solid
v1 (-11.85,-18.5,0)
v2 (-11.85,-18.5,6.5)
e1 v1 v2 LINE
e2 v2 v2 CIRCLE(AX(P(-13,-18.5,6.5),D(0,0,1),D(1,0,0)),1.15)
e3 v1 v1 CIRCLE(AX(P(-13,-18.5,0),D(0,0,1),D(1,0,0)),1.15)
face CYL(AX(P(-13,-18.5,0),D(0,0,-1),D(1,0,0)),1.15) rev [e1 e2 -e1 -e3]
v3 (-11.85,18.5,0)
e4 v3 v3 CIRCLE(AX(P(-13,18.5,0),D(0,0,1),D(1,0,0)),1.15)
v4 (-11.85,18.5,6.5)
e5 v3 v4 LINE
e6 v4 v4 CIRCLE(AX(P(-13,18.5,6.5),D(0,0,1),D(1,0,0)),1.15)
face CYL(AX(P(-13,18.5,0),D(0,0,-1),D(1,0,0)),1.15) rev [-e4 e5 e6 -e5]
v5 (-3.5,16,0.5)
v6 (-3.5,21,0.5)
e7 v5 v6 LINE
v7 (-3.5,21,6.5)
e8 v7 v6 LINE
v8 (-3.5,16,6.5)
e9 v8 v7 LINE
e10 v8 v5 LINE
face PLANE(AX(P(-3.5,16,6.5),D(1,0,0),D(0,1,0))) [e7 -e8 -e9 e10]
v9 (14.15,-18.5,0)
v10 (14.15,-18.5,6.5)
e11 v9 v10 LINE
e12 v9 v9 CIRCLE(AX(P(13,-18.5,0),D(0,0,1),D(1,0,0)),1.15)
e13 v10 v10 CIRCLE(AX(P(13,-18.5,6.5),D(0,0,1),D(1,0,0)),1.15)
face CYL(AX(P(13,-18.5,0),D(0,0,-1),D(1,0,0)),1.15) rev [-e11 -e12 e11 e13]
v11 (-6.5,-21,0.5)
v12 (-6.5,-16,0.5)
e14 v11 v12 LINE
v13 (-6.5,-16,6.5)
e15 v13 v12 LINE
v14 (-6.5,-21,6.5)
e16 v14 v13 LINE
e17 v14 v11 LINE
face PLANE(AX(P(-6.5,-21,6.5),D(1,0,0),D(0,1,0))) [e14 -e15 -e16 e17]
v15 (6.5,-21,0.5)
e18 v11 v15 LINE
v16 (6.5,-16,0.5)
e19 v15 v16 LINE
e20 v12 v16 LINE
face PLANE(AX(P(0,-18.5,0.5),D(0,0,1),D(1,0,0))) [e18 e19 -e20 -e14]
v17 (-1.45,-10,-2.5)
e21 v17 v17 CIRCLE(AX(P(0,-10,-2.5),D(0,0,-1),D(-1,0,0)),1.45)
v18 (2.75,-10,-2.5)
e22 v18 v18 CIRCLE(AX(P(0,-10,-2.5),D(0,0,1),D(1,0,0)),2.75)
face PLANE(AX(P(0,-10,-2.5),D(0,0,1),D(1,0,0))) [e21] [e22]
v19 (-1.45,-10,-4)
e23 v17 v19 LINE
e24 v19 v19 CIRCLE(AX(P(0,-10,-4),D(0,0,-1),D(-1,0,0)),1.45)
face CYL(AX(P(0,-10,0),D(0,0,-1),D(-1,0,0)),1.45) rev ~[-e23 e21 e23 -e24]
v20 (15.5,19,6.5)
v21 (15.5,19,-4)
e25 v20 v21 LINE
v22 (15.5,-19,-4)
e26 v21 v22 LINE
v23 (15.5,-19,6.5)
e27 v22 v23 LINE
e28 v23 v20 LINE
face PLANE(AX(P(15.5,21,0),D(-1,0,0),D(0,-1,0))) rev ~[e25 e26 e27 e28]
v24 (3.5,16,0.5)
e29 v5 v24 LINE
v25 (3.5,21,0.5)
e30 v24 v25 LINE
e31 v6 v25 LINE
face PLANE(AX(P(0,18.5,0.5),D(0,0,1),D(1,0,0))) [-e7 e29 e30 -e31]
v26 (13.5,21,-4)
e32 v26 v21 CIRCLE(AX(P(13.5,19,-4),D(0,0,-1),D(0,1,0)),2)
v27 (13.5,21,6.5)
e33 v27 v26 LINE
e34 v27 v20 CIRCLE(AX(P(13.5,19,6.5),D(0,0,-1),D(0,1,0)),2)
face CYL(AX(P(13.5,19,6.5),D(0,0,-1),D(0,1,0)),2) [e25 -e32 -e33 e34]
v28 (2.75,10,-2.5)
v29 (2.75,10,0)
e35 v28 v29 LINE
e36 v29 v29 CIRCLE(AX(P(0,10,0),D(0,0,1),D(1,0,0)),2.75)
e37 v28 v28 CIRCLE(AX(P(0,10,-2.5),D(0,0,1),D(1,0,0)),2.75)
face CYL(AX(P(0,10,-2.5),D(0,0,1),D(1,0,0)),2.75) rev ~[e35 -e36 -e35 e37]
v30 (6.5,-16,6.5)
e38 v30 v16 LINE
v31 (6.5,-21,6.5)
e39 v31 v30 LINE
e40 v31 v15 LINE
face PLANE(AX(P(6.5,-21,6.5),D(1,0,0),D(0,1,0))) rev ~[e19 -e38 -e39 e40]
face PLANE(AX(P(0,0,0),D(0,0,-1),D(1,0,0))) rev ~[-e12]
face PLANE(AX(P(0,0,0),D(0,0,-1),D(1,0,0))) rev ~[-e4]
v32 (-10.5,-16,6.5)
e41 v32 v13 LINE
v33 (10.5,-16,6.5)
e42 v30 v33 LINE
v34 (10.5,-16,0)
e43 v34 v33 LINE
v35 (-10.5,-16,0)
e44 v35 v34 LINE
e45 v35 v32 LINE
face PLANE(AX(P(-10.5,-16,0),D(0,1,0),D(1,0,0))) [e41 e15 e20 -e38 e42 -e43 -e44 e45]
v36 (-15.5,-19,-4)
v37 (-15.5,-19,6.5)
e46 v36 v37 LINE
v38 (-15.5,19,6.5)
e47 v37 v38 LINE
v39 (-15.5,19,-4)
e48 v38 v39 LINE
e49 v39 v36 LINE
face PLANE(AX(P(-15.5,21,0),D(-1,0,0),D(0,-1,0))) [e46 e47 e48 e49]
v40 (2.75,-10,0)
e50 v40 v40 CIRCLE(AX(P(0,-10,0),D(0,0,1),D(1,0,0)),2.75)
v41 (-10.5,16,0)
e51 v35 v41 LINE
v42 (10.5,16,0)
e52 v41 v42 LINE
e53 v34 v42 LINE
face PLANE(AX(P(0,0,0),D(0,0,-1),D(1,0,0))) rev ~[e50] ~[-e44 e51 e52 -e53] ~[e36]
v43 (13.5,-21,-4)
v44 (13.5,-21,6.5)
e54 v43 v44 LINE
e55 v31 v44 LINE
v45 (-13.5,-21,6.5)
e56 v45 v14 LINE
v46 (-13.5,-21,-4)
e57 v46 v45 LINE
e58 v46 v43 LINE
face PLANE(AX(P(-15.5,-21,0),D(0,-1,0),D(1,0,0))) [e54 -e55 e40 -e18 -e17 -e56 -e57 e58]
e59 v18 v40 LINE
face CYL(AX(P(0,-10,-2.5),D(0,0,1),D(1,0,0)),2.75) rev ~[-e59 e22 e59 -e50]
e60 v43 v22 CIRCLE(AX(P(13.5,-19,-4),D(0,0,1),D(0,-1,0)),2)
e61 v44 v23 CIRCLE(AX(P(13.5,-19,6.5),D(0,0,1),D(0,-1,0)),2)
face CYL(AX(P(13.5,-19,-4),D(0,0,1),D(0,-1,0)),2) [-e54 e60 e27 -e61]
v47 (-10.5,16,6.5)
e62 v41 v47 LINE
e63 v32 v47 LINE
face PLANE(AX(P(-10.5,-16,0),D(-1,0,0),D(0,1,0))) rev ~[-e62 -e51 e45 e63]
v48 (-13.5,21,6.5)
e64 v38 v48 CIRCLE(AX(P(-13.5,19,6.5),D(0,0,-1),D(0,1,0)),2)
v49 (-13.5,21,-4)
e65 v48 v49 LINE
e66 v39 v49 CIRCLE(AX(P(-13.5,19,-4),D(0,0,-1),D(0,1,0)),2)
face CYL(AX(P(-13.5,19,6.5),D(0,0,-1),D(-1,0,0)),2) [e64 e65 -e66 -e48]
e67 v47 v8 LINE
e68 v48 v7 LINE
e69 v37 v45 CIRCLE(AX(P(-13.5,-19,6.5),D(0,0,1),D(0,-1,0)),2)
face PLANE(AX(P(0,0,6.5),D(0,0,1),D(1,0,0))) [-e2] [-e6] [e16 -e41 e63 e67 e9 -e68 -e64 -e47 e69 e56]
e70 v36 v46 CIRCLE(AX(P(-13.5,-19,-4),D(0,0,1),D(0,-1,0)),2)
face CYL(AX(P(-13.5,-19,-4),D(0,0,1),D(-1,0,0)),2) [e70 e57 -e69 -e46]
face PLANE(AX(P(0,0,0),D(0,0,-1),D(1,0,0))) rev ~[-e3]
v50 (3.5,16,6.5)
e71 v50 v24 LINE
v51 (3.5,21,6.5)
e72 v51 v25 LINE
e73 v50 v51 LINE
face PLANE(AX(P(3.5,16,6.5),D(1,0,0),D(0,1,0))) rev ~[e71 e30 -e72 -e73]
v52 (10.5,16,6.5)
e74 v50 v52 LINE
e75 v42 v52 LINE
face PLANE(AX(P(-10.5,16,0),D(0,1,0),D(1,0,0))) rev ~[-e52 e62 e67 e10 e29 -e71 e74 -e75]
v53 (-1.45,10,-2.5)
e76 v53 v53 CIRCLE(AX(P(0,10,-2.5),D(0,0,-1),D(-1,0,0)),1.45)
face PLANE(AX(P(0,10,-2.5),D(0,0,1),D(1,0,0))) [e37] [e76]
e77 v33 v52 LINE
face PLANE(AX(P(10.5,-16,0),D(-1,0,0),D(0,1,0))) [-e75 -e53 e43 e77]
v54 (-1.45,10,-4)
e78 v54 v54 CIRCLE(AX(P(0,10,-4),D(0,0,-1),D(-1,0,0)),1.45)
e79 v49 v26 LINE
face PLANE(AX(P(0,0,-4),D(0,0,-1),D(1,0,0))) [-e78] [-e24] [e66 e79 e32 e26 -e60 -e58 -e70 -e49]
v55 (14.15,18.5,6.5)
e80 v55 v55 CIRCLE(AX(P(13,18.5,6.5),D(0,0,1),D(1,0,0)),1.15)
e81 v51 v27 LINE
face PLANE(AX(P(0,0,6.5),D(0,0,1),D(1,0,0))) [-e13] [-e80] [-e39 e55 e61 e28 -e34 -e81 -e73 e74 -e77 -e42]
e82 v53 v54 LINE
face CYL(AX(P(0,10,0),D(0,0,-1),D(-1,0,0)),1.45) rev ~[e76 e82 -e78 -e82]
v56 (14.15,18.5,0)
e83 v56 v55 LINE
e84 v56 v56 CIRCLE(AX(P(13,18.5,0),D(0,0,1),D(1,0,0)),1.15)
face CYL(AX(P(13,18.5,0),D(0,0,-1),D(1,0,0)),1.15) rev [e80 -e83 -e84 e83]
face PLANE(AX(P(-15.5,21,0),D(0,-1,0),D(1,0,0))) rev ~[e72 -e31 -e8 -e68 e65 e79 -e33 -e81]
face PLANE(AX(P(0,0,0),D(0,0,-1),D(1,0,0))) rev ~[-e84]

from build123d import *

# Parameters (mm, degrees)
F0_W           = 31
F0_H           = 42
F0_R           = 1.15
F0_W_2         = 21
F0_H_2         = 32
F1_DEPTH       = 6.5
F2_W           = 31
F2_H           = 42
F2_R           = 1.15
F2_W_2         = 21
F2_H_2         = 32
F3_DEPTH       = 4
F4_W           = 13
F4_H           = 5
F4_W_2         = 7
F5_DEPTH       = 6
F6_R           = 2
F8_D           = 2.9
F8_CBORE_D     = 5.5
F8_CBORE_DEPTH = 2.5


with BuildPart() as f1:
    # F0 (on Top) → F1 (new body)
    with BuildSketch(Plane.XY):
        Rectangle(F0_W, F0_H)
        with Locations((-13, -18.5)):
            Circle(F0_R, mode=Mode.SUBTRACT)
        with Locations((13, -18.5)):
            Circle(F0_R, mode=Mode.SUBTRACT)
        with Locations((-13, 18.5)):
            Circle(F0_R, mode=Mode.SUBTRACT)
        Rectangle(F0_W_2, F0_H_2, mode=Mode.SUBTRACT)
        with Locations((13, 18.5)):
            Circle(F0_R, mode=Mode.SUBTRACT)
    extrude(amount=F1_DEPTH)

    # F2 (on face) → F3 (join)
    with BuildSketch(Plane(origin=(0, 0, 0), x_dir=(1, 0, 0), z_dir=(0, 0, -1))):
        Rectangle(F2_W, F2_H)
        with Locations((-13, -18.5)):
            Circle(F2_R, mode=Mode.SUBTRACT)
        with Locations((13, -18.5)):
            Circle(F2_R, mode=Mode.SUBTRACT)
        with Locations((-13, 18.5)):
            Circle(F2_R, mode=Mode.SUBTRACT)
        Rectangle(F2_W_2, F2_H_2, mode=Mode.SUBTRACT)
        with Locations((13, 18.5)):
            Circle(F2_R, mode=Mode.SUBTRACT)
        with Locations((-13, 18.5)):
            Circle(F2_R)
        with Locations((13, 18.5)):
            Circle(F2_R)
        with Locations((-13, -18.5)):
            Circle(F2_R)
        Rectangle(F2_W_2, F2_H_2)
        with Locations((13, -18.5)):
            Circle(F2_R)
    extrude(amount=F3_DEPTH)

    # F4 (on face) → F5 (cut)
    with BuildSketch(Plane.XY.offset(6.5)):
        with Locations((0, -18.5)):
            Rectangle(F4_W, F4_H)
        with Locations((0, 18.5)):
            Rectangle(F4_W_2, F4_H)
    extrude(amount=-F5_DEPTH, mode=Mode.SUBTRACT)

    # F6
    f6_edges = [f1.edges().sort_by_distance(p)[0] for p in [
        (-15.5, 21, 1.25),
        (15.5, 21, 1.25),
        (15.5, -21, 1.25),
        (-15.5, -21, 1.25),
    ]]
    fillet(f6_edges, radius=F6_R)

    # F8 (through all)
    with Locations(Plane.XY):
        with Locations((0, 10), (0, -10)):
            CounterBoreHole(F8_D / 2, F8_CBORE_D / 2, F8_CBORE_DEPTH)


solid = f1.part
